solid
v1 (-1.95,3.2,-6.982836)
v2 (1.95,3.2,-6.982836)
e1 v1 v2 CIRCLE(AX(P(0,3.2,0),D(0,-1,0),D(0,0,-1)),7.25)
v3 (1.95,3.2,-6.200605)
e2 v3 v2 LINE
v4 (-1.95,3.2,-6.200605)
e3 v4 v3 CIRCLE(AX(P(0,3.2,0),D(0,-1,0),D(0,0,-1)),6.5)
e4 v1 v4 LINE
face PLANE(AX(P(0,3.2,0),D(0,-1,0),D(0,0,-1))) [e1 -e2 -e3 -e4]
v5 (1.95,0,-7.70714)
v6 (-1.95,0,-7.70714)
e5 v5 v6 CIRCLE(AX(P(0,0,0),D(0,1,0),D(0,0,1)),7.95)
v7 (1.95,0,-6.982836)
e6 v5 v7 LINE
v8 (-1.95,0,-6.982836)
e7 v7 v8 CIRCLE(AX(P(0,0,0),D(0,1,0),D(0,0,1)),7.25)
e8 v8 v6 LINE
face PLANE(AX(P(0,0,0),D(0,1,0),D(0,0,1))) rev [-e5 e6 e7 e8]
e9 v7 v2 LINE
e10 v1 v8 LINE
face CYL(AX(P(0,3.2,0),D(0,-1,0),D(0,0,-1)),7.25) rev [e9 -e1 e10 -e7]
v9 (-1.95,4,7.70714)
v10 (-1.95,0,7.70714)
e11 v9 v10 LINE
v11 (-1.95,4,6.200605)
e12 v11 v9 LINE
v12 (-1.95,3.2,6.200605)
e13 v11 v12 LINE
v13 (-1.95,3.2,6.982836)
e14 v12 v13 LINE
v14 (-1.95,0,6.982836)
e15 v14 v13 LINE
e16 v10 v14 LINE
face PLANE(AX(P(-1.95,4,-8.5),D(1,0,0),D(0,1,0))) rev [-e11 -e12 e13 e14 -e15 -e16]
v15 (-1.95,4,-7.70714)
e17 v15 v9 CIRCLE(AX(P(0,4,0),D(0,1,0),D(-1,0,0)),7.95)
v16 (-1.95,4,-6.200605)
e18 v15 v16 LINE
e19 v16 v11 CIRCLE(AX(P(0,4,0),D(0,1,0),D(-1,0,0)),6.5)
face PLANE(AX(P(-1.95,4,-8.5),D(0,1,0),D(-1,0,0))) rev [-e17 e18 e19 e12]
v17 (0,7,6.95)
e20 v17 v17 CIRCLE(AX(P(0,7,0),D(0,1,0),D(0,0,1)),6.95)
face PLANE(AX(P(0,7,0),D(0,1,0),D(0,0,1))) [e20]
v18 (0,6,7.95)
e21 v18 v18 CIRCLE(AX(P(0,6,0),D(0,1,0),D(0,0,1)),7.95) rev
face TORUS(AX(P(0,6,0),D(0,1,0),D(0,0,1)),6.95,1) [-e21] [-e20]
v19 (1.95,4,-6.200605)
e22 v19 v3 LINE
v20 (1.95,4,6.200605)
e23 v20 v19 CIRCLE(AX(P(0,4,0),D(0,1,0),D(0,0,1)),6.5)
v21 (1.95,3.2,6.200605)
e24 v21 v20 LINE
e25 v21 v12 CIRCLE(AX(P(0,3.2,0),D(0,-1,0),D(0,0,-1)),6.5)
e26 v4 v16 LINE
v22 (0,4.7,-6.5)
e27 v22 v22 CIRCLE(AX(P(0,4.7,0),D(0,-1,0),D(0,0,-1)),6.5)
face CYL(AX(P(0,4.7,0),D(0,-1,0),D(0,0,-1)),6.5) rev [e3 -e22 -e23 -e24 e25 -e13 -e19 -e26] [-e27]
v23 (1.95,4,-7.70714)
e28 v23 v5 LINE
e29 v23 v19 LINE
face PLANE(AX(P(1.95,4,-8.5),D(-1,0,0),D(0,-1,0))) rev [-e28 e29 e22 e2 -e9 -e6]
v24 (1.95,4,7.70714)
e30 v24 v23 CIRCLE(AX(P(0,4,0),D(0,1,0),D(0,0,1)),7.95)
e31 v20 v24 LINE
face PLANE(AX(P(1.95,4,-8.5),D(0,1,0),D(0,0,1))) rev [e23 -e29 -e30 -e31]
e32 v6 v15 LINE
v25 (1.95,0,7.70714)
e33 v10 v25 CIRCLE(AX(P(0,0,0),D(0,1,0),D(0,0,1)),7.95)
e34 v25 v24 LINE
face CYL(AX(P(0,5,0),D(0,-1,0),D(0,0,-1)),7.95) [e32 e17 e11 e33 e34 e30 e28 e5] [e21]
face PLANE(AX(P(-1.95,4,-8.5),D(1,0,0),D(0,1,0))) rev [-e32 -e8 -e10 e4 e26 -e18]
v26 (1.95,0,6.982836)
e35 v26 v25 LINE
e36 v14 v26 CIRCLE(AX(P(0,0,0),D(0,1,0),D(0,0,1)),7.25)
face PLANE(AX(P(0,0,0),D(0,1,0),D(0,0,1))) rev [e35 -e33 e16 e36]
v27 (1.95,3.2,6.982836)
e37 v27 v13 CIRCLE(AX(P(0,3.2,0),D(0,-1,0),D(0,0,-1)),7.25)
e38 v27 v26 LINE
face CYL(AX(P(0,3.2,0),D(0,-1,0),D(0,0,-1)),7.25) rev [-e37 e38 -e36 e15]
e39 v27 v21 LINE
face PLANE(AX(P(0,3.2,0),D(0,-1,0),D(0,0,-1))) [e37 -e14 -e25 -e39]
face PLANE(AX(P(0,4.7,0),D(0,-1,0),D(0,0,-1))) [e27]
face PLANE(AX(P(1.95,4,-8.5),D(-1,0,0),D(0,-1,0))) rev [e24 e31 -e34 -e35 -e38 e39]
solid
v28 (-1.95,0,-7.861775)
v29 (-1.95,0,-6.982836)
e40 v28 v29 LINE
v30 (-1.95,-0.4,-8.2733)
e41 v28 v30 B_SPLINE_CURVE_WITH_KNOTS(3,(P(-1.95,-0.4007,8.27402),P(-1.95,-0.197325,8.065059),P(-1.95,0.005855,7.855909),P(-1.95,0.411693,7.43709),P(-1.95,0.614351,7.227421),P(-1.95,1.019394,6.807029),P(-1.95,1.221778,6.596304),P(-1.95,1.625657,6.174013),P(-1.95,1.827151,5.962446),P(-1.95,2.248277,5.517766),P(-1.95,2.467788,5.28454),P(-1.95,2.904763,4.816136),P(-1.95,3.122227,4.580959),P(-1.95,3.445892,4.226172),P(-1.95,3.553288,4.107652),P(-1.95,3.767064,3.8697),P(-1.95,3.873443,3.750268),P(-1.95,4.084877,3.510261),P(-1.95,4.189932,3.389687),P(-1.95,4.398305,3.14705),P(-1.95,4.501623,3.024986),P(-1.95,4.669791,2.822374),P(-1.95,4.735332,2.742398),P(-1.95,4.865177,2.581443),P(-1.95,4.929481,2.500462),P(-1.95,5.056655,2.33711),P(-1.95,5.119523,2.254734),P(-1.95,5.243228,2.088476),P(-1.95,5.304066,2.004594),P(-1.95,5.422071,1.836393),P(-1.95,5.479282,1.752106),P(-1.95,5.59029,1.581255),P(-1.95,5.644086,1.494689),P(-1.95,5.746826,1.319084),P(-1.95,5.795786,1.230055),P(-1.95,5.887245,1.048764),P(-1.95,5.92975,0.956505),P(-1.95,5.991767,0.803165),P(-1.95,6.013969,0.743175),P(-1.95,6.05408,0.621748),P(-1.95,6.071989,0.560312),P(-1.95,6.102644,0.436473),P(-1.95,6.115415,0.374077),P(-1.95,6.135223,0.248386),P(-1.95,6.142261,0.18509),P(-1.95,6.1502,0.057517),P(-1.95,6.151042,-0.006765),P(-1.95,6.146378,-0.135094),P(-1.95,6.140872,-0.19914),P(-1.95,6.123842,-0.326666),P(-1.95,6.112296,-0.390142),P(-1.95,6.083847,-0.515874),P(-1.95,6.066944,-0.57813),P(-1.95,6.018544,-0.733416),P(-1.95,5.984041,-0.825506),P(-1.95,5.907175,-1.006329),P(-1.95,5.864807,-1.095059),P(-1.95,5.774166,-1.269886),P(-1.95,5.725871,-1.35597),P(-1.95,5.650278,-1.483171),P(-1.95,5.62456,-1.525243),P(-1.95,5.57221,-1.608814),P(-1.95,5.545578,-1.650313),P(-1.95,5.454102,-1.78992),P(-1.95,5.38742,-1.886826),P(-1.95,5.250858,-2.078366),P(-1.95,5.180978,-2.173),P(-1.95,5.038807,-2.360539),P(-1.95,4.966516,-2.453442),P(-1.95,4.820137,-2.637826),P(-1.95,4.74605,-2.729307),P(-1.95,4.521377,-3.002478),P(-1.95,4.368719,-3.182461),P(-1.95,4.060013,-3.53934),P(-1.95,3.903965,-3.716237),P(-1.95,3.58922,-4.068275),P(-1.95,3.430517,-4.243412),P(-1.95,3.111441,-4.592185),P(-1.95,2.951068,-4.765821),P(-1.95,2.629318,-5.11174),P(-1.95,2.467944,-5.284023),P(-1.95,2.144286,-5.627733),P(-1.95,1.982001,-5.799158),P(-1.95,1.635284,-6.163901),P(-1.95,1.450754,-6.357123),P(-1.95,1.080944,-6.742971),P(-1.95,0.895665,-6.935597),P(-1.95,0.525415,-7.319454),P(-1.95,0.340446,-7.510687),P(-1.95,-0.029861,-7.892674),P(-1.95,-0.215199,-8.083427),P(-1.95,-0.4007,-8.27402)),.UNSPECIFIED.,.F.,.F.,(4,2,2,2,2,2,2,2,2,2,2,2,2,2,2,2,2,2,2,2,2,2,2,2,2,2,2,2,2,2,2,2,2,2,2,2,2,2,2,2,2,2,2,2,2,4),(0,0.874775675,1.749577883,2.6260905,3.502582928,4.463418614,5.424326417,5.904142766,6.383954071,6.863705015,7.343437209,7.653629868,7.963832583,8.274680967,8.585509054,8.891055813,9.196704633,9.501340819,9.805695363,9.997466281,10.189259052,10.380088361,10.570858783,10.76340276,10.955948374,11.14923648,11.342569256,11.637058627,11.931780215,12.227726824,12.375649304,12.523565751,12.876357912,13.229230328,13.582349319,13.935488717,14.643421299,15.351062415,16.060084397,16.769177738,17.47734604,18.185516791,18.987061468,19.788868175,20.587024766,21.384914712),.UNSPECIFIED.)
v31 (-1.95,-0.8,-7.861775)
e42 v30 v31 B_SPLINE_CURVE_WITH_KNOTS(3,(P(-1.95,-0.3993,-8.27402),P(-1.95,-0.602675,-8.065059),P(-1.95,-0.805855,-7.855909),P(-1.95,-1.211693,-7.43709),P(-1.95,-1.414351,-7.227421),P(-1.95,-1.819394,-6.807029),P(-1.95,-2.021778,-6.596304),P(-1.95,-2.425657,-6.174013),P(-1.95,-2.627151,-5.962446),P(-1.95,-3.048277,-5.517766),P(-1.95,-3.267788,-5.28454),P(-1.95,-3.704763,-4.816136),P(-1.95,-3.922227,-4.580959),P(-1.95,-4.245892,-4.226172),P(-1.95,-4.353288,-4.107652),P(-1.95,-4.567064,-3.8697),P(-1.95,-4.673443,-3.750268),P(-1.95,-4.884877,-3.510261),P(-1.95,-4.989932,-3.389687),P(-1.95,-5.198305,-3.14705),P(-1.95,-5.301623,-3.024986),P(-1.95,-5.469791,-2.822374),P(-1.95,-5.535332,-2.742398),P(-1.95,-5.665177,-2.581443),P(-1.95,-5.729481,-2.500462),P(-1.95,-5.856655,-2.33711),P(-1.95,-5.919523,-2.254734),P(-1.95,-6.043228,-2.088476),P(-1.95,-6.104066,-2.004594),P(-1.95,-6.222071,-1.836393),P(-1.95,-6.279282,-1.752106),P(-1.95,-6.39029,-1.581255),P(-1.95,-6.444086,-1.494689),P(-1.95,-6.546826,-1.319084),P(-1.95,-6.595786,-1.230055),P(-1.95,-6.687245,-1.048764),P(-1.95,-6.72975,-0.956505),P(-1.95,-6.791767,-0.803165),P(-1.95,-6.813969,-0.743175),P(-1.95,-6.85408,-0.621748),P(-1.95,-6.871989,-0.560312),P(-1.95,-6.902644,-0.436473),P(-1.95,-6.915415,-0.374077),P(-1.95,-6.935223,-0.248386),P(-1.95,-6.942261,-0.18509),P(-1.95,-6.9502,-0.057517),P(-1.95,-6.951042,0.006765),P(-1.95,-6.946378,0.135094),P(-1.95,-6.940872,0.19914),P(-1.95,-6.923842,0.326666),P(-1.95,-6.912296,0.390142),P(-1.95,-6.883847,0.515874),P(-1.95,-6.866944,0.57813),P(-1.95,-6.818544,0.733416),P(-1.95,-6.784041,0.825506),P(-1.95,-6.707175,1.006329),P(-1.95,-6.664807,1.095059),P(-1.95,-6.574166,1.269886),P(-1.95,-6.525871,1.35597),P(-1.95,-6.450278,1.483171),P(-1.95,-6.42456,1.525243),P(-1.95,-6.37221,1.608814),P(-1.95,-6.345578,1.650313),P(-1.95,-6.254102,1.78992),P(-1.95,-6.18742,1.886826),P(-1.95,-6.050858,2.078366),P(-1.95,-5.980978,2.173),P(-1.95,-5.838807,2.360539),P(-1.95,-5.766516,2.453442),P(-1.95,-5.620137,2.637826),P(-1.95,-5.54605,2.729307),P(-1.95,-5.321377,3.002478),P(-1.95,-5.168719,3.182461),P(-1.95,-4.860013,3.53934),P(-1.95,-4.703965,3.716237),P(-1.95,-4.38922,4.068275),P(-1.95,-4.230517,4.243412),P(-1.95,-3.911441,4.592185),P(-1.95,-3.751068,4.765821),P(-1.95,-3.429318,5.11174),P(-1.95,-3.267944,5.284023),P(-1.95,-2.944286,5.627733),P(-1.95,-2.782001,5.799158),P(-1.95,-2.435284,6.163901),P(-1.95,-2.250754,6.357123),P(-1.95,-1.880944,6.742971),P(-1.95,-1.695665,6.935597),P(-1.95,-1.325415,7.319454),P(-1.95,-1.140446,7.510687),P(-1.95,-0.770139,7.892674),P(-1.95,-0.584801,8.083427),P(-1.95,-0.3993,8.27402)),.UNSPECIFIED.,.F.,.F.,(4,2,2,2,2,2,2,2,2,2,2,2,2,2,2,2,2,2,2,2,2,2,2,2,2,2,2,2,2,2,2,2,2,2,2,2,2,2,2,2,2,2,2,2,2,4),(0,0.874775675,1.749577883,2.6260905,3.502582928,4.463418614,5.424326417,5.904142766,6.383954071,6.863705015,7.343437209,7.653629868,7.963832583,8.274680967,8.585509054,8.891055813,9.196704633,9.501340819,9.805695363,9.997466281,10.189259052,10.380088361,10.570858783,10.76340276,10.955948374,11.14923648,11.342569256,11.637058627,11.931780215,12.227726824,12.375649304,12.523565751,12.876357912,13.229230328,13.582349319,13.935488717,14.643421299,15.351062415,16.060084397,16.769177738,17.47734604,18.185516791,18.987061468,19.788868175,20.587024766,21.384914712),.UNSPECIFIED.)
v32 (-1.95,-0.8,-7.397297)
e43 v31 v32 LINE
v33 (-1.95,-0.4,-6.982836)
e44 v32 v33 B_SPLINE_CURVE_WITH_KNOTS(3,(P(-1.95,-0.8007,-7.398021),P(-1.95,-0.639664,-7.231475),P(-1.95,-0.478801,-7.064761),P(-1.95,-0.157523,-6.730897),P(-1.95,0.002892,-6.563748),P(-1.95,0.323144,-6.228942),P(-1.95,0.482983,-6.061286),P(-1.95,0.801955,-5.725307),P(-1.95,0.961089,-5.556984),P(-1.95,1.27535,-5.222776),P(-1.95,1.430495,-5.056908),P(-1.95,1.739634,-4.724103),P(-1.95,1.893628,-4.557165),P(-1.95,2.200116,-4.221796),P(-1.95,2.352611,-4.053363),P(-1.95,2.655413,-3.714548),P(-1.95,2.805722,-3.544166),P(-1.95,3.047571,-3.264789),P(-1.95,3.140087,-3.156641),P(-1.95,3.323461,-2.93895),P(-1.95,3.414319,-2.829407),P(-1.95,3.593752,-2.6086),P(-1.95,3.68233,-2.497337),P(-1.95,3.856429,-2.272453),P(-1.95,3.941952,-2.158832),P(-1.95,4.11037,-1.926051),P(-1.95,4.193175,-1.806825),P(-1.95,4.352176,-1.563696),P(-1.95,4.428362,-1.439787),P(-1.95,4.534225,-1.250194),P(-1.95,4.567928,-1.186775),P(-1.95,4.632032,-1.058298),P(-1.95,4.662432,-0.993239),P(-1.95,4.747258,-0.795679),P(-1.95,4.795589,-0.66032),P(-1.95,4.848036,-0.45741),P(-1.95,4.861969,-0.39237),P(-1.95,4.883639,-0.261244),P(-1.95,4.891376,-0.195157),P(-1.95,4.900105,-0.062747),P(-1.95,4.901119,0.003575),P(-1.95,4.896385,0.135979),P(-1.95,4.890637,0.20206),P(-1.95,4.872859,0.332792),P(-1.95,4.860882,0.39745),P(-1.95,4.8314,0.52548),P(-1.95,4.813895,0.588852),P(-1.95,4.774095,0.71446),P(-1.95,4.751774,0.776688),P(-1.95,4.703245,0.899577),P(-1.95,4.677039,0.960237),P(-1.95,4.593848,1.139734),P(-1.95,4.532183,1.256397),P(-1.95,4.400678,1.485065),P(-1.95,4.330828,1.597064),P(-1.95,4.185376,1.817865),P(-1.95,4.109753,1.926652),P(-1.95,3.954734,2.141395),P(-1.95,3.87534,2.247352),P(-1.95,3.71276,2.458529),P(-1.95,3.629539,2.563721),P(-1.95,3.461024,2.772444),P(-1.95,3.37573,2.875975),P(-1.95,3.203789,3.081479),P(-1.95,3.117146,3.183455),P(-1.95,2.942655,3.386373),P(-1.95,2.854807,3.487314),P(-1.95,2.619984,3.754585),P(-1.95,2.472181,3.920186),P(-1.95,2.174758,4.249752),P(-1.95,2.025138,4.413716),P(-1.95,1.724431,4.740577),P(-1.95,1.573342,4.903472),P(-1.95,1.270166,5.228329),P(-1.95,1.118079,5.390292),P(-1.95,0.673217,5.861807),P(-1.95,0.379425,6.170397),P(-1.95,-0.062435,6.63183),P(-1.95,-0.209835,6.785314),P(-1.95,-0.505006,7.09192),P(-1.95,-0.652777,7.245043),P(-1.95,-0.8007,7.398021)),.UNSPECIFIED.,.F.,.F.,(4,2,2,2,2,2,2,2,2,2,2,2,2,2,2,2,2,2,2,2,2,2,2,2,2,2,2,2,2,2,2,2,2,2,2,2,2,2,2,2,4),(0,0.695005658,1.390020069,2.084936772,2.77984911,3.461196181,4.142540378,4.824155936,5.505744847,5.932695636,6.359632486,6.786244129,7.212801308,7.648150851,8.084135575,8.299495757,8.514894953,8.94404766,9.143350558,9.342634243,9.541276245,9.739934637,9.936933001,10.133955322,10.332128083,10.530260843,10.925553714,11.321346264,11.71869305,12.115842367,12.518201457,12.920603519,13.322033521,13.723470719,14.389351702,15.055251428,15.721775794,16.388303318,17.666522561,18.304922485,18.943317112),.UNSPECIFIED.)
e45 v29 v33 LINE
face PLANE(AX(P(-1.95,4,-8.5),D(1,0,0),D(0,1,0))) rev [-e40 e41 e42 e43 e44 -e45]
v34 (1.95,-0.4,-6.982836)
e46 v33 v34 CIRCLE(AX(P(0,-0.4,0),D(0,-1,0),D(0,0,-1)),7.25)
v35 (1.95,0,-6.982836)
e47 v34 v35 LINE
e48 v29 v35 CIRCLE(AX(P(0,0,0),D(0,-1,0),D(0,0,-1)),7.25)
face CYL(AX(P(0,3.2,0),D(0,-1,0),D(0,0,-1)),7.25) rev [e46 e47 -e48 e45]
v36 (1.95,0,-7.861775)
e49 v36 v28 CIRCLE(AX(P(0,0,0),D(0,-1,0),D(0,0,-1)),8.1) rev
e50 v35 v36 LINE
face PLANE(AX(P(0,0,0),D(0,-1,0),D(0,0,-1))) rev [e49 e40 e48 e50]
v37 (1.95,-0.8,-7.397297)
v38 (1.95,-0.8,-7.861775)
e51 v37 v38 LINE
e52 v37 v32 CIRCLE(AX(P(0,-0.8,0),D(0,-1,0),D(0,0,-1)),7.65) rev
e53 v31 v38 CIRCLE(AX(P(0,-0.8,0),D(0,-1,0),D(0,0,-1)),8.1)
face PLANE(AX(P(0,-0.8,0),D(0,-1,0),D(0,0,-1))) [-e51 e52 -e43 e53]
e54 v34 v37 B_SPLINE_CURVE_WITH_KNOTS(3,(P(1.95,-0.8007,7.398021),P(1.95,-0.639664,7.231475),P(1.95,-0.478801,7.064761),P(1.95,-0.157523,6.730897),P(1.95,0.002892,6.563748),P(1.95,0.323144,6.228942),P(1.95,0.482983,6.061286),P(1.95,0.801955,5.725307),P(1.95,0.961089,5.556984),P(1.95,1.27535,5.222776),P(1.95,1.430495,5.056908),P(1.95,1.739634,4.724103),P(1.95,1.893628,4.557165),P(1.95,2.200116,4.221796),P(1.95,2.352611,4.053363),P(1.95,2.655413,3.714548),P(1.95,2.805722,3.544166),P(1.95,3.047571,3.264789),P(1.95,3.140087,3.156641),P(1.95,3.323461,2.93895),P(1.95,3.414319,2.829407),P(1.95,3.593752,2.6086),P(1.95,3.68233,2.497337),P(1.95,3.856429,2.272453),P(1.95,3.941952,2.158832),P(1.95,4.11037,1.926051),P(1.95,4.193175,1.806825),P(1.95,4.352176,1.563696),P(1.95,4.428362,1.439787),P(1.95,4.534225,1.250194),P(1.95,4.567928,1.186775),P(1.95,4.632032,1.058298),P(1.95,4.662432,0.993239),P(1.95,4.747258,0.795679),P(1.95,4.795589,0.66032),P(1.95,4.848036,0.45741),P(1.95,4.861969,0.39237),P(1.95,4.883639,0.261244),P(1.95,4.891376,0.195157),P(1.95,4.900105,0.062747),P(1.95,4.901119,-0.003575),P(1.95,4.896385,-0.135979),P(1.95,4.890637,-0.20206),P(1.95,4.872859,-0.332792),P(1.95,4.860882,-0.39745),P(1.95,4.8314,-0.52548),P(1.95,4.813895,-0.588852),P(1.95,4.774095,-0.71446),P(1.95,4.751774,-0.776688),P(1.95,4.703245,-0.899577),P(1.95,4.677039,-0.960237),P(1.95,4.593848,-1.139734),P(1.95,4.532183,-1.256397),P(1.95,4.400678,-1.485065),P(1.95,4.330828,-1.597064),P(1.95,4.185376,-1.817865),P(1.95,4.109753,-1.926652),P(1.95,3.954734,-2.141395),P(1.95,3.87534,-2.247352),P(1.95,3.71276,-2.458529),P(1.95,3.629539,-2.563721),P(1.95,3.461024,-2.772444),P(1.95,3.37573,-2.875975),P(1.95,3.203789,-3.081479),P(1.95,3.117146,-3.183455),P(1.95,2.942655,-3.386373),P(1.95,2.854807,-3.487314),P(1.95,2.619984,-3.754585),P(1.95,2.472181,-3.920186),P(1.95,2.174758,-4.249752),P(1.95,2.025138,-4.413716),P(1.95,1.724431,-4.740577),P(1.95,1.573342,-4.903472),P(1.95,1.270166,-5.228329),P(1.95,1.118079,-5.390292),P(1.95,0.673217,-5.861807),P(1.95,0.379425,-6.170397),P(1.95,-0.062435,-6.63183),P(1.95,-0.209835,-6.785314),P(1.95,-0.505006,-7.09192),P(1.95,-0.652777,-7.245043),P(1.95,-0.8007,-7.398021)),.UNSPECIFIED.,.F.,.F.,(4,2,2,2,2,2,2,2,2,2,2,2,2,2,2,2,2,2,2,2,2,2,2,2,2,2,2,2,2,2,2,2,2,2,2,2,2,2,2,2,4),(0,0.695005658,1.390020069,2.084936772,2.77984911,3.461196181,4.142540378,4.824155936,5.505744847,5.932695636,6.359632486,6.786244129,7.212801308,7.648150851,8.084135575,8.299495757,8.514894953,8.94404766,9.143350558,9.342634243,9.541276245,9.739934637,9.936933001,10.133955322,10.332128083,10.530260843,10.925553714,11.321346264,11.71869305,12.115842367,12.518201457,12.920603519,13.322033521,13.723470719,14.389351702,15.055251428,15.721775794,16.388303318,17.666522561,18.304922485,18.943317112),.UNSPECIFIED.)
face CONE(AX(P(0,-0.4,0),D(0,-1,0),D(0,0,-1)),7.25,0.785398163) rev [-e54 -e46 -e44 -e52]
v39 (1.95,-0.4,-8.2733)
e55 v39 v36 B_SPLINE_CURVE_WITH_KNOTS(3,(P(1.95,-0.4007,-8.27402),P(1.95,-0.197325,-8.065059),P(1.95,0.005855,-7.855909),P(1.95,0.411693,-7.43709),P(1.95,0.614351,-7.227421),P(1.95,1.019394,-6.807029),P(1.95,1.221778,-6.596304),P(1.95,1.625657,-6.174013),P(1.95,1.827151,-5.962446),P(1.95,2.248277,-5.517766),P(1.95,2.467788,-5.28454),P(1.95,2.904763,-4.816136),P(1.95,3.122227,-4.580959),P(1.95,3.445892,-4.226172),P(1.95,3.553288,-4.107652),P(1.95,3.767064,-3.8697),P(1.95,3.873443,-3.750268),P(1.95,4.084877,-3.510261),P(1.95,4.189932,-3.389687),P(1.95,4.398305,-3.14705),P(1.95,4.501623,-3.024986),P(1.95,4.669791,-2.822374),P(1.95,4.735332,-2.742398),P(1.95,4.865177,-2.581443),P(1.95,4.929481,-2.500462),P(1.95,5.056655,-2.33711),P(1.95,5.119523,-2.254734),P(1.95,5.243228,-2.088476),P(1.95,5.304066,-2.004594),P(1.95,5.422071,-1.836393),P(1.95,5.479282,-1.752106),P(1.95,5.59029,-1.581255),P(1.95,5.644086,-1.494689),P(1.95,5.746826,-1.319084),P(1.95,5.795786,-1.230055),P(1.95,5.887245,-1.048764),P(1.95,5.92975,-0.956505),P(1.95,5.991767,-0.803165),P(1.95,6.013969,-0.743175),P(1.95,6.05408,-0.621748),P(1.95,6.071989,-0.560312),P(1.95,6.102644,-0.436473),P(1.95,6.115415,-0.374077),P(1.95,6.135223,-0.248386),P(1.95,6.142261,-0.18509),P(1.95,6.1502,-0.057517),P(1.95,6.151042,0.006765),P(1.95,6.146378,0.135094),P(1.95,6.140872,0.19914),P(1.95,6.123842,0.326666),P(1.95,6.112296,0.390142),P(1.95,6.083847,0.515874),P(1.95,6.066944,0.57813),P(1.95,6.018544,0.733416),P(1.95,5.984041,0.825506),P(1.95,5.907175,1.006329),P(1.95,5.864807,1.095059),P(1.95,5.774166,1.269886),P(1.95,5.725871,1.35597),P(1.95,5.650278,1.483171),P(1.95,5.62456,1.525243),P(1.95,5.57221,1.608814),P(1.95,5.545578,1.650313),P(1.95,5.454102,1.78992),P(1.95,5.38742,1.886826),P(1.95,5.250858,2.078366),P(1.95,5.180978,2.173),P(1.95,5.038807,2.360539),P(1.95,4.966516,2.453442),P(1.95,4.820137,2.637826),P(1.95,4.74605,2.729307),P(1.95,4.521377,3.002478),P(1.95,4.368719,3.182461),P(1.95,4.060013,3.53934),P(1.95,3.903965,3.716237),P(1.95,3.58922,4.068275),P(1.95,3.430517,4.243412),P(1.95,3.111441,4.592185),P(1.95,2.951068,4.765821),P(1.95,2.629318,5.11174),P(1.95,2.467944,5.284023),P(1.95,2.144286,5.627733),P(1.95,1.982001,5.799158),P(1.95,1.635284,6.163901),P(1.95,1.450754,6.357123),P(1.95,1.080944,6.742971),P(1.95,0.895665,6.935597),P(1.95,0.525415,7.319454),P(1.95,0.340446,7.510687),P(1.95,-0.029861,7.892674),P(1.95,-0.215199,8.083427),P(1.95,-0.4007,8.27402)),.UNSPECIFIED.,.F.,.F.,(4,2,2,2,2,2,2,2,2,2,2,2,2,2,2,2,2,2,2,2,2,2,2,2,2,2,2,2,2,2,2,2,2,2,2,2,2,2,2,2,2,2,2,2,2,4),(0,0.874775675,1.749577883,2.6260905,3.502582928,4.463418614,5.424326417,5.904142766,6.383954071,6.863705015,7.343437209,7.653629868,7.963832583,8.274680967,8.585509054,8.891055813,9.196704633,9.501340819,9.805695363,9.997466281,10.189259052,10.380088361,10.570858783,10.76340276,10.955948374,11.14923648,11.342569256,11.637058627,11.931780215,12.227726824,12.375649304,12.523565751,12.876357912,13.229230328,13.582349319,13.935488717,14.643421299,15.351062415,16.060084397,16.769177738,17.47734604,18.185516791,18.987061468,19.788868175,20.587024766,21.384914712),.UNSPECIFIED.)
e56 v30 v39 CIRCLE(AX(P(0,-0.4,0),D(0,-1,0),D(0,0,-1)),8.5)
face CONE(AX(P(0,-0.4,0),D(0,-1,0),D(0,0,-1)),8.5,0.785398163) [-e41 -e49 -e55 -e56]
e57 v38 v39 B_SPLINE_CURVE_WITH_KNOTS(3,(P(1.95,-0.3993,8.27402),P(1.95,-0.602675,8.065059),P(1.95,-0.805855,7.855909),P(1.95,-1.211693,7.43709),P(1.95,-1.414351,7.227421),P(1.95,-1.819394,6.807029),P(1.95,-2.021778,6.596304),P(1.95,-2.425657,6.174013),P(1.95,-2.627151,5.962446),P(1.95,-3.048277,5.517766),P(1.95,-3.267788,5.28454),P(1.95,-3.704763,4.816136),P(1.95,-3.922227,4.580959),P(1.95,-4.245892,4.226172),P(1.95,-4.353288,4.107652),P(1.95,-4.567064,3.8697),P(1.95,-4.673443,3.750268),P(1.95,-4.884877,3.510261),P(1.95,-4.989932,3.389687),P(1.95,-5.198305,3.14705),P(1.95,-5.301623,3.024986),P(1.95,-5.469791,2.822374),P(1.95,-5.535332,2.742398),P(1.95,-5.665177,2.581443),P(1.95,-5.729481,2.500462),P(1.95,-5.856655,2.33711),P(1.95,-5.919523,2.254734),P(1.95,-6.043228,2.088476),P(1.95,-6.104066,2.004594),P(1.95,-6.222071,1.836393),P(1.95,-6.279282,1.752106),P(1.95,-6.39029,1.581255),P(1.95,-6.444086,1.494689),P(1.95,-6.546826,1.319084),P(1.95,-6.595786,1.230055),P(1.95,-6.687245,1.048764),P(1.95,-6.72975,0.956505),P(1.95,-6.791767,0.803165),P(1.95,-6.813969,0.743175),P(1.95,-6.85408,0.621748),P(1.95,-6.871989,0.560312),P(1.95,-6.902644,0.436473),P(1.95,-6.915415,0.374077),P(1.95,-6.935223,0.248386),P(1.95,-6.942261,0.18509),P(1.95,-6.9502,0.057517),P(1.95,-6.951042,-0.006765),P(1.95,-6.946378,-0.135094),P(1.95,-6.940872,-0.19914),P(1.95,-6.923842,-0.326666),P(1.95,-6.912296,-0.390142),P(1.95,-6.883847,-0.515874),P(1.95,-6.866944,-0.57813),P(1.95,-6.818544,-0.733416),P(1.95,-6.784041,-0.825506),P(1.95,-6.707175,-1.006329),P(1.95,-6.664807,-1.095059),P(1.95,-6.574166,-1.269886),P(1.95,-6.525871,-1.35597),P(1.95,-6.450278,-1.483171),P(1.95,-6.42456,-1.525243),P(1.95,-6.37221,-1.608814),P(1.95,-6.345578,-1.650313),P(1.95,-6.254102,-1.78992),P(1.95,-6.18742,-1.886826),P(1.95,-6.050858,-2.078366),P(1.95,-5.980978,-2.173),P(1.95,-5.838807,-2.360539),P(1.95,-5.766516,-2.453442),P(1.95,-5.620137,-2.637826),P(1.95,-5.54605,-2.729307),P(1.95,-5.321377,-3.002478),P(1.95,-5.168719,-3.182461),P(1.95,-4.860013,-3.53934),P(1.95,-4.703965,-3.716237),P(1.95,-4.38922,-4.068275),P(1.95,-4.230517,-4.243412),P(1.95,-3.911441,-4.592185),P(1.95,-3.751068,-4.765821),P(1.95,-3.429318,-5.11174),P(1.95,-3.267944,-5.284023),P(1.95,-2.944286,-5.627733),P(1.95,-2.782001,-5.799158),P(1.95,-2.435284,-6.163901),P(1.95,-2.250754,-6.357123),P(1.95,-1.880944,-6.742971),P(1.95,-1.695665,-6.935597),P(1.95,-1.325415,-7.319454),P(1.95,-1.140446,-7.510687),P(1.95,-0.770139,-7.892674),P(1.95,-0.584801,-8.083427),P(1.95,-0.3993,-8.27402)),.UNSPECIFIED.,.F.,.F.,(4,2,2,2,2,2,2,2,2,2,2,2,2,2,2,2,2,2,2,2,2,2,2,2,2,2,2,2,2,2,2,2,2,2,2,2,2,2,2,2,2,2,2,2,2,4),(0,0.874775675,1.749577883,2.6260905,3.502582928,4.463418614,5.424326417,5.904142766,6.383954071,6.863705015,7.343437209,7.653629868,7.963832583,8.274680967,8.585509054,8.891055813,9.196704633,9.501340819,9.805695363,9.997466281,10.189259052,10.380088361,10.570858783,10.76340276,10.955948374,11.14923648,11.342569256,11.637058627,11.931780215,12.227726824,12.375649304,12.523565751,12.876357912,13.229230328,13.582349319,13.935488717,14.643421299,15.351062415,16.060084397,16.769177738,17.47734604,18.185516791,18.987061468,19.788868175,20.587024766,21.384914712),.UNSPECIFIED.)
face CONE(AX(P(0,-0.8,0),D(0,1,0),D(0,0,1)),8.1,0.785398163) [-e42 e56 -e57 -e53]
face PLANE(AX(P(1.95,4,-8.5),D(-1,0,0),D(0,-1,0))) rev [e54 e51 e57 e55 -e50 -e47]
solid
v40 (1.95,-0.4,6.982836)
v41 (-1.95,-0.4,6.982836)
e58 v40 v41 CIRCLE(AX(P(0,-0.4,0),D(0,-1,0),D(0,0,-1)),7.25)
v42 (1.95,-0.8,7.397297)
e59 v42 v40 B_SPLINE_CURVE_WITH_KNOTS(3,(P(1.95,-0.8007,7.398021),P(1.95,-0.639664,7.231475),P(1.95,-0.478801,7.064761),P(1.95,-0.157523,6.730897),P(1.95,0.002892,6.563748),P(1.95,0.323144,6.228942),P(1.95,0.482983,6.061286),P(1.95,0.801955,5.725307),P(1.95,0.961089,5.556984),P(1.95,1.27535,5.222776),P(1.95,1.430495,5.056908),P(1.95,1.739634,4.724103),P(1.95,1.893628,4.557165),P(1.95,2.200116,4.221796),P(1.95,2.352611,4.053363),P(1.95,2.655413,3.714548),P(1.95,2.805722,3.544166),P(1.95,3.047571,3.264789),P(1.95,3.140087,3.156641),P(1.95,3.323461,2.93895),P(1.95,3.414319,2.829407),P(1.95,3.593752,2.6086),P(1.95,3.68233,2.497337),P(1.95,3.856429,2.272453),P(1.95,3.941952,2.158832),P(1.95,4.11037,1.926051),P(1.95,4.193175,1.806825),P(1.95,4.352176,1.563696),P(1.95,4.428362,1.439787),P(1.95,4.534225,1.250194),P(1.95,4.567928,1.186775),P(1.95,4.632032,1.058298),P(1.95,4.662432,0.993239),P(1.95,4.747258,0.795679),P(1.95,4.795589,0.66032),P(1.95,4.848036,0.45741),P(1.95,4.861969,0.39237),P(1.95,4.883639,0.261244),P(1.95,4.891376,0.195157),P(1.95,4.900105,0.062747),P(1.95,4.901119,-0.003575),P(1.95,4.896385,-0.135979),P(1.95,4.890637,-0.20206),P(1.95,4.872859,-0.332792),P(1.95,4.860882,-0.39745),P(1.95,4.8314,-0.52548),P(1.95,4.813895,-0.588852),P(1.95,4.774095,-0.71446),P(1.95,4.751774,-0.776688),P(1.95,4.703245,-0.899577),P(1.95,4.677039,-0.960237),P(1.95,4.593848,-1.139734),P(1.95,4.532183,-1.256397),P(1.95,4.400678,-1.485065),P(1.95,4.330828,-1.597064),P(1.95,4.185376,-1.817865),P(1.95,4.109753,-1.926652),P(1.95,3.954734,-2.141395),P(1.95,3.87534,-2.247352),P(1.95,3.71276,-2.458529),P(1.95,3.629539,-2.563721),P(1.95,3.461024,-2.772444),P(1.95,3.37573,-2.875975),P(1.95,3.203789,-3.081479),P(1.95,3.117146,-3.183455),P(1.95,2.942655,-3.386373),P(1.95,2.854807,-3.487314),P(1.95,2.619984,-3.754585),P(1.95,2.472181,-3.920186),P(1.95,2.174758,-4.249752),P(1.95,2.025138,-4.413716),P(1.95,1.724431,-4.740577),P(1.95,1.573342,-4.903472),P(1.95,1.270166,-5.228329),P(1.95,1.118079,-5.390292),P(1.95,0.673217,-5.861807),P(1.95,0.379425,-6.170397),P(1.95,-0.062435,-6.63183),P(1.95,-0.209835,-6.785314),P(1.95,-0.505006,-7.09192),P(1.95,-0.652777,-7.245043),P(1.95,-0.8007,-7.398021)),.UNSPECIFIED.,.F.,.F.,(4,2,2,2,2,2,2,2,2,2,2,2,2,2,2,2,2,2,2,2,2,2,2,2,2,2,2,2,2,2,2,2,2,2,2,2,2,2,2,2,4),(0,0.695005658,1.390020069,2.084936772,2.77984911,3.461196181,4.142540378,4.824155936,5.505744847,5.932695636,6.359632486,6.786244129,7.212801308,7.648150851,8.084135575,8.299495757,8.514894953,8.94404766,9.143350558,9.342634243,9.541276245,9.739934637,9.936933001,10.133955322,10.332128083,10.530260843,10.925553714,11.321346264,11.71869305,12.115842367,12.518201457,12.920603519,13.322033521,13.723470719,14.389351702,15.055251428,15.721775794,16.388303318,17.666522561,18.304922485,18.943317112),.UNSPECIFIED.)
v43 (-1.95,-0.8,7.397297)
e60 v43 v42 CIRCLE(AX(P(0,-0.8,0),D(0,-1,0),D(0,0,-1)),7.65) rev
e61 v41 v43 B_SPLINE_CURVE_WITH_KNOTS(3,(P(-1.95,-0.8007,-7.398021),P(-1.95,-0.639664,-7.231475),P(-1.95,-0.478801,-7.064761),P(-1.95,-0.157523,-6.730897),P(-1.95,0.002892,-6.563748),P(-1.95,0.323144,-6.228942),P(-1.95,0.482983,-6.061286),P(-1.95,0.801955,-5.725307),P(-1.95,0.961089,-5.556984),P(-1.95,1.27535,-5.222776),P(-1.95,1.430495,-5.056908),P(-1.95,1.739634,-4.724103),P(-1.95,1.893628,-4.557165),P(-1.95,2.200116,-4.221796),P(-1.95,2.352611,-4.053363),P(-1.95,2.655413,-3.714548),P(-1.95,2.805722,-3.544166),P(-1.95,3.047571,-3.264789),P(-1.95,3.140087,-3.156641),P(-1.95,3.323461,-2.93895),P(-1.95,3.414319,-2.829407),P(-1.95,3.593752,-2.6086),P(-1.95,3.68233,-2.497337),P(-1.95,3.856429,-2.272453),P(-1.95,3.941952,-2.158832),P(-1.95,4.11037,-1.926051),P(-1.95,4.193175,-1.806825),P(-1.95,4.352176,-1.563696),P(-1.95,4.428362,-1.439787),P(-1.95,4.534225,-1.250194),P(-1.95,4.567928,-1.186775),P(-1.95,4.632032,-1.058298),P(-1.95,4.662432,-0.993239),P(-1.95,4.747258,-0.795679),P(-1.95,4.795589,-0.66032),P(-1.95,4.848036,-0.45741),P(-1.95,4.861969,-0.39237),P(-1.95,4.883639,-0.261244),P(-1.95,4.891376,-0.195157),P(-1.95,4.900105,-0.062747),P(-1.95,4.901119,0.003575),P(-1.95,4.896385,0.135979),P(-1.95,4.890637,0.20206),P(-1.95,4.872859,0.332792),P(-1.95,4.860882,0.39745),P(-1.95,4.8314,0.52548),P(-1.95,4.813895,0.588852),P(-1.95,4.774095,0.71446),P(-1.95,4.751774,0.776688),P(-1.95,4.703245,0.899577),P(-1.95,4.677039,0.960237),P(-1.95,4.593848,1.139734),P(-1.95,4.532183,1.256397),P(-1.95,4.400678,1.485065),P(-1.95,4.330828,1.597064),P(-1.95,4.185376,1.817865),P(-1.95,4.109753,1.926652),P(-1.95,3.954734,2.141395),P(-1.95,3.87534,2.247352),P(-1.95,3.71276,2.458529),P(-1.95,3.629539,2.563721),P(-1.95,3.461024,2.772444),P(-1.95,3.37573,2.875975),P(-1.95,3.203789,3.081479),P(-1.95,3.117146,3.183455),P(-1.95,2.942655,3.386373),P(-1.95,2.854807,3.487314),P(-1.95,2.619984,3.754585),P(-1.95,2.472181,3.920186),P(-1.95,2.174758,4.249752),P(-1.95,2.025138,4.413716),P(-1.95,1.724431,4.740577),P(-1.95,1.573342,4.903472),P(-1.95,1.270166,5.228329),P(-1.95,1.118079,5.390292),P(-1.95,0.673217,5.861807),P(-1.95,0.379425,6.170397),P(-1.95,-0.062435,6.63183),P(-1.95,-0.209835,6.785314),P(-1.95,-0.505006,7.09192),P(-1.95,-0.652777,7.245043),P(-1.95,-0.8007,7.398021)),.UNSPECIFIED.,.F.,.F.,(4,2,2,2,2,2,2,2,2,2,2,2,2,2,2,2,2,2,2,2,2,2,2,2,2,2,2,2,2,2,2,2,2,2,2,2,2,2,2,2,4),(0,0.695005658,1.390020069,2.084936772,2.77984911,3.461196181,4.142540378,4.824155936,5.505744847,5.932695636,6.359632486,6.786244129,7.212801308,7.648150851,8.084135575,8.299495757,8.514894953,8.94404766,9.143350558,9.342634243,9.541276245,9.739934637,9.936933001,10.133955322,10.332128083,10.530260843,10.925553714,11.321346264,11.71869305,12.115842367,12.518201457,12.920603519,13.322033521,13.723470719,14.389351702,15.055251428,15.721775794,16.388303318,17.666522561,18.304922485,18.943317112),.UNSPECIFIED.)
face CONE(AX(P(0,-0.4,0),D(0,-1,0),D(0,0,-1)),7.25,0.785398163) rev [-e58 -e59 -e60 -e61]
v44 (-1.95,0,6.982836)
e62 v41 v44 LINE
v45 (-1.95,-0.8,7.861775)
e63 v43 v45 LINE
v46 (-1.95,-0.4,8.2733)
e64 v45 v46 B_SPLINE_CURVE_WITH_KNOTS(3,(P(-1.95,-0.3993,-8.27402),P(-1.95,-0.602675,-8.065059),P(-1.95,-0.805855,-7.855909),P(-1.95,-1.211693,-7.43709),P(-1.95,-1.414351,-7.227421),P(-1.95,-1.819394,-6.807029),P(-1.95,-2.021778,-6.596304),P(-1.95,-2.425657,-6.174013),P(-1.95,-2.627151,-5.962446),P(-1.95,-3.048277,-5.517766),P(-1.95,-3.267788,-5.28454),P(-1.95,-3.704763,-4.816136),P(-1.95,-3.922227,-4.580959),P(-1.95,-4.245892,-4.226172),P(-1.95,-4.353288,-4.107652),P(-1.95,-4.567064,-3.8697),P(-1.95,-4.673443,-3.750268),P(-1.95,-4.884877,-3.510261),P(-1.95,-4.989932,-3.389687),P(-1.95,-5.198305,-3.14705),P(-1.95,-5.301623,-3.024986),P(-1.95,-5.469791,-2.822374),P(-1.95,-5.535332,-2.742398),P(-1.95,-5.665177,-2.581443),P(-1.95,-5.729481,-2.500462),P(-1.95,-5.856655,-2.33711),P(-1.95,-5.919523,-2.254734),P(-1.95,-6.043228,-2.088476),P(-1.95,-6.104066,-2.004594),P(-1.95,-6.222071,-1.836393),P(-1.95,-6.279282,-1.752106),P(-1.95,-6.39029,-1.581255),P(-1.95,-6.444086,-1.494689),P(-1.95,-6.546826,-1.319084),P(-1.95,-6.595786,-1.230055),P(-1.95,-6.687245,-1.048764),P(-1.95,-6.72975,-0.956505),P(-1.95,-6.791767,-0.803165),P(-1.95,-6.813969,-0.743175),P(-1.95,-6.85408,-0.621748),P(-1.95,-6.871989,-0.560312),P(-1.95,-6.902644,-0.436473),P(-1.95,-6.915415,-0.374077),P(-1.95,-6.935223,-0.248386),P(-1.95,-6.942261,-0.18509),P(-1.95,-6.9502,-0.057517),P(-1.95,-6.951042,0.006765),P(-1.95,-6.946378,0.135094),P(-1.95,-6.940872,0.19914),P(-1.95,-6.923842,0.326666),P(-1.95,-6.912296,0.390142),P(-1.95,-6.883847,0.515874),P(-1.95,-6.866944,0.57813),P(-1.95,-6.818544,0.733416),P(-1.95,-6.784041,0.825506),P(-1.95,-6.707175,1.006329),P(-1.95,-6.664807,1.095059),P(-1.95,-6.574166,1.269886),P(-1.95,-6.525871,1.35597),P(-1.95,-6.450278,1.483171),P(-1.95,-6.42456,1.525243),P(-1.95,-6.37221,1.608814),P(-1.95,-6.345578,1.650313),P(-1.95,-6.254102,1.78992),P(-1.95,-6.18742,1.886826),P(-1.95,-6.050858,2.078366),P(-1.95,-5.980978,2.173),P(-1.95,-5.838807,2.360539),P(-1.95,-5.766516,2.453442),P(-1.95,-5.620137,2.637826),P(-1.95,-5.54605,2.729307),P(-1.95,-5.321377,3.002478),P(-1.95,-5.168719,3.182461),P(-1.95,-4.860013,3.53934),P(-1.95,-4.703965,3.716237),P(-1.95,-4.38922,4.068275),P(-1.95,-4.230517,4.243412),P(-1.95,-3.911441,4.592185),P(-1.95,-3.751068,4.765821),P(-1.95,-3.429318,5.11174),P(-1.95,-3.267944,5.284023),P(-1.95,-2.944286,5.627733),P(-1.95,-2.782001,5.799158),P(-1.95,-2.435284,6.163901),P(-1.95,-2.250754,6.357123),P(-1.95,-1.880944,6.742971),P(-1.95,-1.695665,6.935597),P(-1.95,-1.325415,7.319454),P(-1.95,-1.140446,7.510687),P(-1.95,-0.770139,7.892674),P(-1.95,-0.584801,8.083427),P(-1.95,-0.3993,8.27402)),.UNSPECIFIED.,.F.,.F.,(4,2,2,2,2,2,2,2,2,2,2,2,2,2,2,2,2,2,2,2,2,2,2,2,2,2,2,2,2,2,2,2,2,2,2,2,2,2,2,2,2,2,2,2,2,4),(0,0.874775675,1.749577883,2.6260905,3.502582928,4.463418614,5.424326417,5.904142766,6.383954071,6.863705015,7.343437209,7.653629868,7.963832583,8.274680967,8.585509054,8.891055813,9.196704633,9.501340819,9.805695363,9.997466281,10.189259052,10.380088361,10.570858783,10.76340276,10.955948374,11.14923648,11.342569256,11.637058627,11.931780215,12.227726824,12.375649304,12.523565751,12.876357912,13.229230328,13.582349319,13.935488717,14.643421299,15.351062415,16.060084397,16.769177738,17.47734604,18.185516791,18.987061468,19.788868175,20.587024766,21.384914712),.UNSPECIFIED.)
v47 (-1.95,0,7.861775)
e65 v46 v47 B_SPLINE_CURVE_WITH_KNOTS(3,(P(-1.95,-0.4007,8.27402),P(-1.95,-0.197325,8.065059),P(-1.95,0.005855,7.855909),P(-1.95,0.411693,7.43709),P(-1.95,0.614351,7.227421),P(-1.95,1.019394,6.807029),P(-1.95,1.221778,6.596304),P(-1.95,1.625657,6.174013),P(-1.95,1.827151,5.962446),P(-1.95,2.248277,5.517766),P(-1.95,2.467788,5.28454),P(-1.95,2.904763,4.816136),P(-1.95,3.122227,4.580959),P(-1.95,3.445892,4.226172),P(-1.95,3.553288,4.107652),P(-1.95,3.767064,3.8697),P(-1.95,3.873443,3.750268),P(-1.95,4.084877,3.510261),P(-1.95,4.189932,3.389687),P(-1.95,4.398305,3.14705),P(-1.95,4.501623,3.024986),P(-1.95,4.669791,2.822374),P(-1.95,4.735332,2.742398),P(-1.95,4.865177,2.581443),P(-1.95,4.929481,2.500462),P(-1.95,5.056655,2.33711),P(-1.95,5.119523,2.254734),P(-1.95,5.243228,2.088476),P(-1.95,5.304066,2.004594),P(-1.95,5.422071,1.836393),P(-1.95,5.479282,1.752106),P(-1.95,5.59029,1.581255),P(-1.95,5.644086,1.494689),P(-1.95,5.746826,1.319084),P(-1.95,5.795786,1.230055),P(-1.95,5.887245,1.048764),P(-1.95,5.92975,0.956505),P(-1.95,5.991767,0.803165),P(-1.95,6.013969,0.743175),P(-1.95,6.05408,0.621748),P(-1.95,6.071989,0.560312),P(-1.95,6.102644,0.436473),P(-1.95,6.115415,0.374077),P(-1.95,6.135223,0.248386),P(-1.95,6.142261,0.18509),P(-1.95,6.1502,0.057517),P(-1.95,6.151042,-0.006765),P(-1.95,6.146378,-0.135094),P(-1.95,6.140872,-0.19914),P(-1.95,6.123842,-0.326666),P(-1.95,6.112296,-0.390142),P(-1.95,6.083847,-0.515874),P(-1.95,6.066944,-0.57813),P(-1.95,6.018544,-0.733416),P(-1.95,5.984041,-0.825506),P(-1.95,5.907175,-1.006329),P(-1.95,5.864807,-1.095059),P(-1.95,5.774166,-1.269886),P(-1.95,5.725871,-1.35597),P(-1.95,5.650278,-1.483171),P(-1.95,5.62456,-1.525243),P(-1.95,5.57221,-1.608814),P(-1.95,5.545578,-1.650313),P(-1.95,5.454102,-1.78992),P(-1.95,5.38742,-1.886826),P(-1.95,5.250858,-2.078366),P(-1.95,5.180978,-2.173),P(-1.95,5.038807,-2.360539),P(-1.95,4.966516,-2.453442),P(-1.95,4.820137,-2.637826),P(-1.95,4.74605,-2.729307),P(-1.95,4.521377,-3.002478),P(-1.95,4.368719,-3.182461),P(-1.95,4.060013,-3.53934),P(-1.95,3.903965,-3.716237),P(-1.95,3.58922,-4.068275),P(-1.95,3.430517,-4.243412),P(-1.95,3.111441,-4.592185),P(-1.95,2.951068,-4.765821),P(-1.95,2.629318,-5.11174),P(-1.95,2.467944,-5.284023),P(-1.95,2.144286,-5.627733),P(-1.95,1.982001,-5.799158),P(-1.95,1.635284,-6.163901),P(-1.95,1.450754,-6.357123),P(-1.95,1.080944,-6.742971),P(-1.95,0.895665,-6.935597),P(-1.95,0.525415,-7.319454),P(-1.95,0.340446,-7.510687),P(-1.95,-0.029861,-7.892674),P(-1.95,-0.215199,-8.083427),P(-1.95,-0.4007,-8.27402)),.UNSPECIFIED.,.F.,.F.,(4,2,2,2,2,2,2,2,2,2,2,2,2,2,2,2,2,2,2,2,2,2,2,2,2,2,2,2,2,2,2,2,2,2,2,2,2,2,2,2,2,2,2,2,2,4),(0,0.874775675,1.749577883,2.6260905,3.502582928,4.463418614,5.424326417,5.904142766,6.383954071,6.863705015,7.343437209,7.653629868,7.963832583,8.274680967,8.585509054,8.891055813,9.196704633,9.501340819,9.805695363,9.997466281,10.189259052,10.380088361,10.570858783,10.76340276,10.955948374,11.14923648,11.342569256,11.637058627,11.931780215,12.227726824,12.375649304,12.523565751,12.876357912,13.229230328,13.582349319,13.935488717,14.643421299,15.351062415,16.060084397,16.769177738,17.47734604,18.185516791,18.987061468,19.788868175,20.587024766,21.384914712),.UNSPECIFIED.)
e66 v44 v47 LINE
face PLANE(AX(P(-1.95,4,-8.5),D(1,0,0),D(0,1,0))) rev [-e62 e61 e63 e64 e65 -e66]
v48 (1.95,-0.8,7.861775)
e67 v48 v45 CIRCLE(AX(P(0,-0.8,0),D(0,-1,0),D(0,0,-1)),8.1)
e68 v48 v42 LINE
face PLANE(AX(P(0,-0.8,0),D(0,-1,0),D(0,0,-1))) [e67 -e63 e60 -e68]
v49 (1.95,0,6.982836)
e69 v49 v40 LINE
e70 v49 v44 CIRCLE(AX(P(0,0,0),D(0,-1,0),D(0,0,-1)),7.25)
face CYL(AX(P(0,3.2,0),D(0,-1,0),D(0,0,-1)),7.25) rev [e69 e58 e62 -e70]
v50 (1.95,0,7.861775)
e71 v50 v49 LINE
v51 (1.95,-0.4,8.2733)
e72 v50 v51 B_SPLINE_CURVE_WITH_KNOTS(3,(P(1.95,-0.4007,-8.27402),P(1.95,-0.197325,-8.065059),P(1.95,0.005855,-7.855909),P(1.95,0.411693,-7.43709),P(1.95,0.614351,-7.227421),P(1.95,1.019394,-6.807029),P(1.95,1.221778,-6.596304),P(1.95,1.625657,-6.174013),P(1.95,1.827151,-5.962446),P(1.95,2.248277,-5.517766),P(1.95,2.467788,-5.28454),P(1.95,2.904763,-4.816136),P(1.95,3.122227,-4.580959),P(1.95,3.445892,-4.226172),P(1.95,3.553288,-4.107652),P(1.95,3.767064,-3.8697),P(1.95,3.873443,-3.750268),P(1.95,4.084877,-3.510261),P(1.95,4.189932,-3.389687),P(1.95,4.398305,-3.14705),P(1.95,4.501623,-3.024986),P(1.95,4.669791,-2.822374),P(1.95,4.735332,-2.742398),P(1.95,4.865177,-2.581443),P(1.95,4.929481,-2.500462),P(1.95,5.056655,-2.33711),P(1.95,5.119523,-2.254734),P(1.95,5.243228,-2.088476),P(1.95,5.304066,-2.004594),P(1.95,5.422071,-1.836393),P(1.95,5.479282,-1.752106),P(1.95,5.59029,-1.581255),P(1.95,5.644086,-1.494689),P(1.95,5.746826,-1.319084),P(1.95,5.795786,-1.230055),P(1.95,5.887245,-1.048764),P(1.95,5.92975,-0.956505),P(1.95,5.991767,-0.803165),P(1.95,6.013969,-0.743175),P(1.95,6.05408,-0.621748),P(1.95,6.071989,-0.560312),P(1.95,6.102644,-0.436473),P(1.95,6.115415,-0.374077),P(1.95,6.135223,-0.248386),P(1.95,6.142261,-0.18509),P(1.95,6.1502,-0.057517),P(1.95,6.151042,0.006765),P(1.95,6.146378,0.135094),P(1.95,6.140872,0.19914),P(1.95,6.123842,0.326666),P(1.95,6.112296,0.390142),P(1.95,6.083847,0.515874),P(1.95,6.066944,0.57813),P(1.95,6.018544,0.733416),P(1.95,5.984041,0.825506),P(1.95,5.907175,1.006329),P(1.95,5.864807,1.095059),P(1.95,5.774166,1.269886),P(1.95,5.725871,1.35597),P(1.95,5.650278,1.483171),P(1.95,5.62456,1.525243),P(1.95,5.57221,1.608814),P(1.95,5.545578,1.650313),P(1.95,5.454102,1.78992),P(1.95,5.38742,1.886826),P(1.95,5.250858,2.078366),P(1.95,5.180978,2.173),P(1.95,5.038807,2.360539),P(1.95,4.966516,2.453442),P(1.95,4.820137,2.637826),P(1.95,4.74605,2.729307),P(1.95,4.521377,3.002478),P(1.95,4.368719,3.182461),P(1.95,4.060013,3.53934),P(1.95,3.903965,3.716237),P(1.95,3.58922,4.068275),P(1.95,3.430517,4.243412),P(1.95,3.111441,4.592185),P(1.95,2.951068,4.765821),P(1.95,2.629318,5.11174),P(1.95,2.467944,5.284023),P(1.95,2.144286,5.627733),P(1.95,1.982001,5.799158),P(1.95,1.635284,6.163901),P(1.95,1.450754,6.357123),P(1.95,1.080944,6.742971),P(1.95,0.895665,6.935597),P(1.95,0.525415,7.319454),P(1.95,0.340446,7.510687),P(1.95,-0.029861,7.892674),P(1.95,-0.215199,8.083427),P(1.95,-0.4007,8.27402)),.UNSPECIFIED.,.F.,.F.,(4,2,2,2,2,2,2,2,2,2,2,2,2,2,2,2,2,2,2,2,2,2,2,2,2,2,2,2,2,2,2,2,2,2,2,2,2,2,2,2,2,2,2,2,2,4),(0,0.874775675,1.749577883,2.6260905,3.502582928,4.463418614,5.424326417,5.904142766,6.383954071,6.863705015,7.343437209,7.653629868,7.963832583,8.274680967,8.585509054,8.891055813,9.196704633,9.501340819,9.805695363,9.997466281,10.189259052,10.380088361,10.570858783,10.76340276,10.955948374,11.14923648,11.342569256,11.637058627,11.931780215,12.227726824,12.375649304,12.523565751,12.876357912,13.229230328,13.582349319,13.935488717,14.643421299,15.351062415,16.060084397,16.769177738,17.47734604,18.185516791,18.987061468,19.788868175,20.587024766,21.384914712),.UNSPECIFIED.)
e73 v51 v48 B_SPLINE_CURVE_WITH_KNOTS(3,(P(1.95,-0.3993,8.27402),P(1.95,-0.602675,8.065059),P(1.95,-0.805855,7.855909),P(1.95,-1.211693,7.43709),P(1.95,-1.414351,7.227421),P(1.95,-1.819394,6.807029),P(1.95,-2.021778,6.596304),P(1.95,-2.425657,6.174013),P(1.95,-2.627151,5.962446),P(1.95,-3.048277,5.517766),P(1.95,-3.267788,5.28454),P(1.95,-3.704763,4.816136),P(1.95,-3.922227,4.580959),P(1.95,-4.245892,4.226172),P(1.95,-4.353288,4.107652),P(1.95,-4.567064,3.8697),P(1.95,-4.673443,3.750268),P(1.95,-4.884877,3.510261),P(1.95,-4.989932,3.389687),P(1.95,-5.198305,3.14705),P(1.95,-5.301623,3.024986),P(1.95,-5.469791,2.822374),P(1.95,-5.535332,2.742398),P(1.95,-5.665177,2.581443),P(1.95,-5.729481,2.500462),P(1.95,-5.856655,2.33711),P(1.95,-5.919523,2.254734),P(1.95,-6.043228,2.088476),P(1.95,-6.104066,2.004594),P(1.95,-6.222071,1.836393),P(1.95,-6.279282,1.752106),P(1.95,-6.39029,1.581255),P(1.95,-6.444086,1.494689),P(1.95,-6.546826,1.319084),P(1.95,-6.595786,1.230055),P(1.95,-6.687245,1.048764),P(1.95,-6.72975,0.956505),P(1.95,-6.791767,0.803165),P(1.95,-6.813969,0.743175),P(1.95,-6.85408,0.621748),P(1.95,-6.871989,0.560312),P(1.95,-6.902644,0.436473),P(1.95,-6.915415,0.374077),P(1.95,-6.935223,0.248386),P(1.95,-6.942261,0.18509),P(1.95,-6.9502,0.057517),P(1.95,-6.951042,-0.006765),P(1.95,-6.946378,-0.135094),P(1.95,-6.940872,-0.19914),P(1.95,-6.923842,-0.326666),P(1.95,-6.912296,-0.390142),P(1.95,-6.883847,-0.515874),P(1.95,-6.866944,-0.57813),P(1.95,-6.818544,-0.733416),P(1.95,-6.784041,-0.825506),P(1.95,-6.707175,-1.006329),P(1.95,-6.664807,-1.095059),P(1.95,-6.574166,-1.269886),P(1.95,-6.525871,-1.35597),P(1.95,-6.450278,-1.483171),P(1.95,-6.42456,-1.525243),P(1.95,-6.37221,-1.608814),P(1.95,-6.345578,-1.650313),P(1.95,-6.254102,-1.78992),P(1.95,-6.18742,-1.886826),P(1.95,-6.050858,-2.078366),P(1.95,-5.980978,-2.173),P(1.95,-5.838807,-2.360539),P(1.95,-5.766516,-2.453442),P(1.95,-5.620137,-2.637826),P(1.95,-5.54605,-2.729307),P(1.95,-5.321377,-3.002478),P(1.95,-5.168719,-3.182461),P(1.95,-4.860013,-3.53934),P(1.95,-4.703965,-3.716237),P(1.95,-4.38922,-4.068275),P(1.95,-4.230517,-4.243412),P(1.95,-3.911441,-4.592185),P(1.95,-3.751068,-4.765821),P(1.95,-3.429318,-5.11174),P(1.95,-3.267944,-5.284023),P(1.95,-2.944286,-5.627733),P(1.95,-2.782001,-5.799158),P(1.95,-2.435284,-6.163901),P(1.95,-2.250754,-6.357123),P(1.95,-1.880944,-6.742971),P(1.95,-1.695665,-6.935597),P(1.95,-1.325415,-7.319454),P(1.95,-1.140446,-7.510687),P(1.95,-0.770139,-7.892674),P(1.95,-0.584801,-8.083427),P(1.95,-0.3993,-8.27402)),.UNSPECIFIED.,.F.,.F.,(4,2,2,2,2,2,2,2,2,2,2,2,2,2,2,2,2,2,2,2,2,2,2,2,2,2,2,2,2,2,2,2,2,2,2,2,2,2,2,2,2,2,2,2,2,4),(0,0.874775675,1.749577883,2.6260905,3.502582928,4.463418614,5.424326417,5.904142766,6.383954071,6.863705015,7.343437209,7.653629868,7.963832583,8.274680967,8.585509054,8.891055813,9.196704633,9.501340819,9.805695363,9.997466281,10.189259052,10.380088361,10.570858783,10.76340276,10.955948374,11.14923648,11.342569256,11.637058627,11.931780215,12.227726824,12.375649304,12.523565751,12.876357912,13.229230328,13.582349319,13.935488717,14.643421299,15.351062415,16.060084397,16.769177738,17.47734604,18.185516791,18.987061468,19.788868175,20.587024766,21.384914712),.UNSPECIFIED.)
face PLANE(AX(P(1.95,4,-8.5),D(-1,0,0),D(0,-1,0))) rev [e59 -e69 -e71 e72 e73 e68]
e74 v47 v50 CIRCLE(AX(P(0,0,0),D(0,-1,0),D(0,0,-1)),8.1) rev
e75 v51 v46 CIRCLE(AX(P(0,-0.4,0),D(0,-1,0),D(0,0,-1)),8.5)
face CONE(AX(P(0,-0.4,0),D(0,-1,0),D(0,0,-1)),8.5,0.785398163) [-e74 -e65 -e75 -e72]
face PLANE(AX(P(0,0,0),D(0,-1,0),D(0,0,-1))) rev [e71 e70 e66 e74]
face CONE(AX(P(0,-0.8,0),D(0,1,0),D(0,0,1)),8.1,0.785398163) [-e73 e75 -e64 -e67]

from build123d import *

# Parameters (mm, degrees)
SKETCH_2_R               = 7.95
EXTRUDE_1_DEPTH          = 5
SKETCH_4_R               = 8.5
EXTRUDE_2_DEPTH          = 0.8
SKETCH_3_R               = 7.25
CUT_EXTRUDE_2_DEPTH      = 4
CHAMFER_2_SIZE           = 0.4
CUT_EXTRUDE_3_DEPTH      = 14.019216566
CUT_EXTRUDE_3_DEPTH_BACK = 14.019216566
SKETCH_5_W               = 6
SKETCH_5_H               = 8
SKETCH_6_R               = 7.95
EXTRUDE_3_DEPTH          = 2
FILLET_1_R               = 1
SKETCH_7_R               = 6.5
CUT_EXTRUDE_4_DEPTH      = 1.5
CUT_EXTRUDE_8_DEPTH      = 14.910427743
CUT_EXTRUDE_8_DEPTH_BACK = 14.910427743
SKETCH_9_W               = 2.014745723
SKETCH_9_H               = 2.313226571
SKETCH_9_W_2             = 1.942835104
SKETCH_9_H_2             = 2.895732504


with BuildPart() as part:
    # 草图2 → 凸台-拉伸1 (new body)
    with BuildSketch(Plane(origin=(0, 0, 0), x_dir=(1, 0, 0), z_dir=(0, 1, 0))):
        with Locations(Location((0, 0, 0), (0, 0, 270))):
            Circle(SKETCH_2_R)
    extrude(amount=EXTRUDE_1_DEPTH)


with BuildPart() as body_2:
    # 草图4 → 凸台-拉伸2 (new body)
    with BuildSketch(Plane.XZ):
        with Locations(Location((0, 0, 0), (0, 0, 270))):
            Circle(SKETCH_4_R)
    extrude(amount=EXTRUDE_2_DEPTH)


with BuildPart() as cut_extrude_2_tool:
    # 草图3 → 切除-拉伸2 (new body)
    with BuildSketch(Plane.XZ.offset(0.8)):
        with Locations(Location((0, 0, 0), (0, 0, 270))):
            Circle(SKETCH_3_R)
    extrude(amount=-CUT_EXTRUDE_2_DEPTH)


with BuildPart() as part_1:
    add(part.part)

    # 切除-拉伸2: cut by cut_extrude_2_tool
    add(cut_extrude_2_tool.part, mode=Mode.SUBTRACT)


with BuildPart() as body_2_1:
    add(body_2.part)

    # 切除-拉伸2: cut by cut_extrude_2_tool
    add(cut_extrude_2_tool.part, mode=Mode.SUBTRACT)

    # 倒角2
    # the kernel refuses this chamfer: 0.4 mm, written as the material it takes off along each edge
    with BuildSketch(Plane(origin=(0, 0, 0), x_dir=(0, 0, -1), z_dir=(-1, 0, 0))) as chamfer_2_piece_1:
        Polygon((8.5, CHAMFER_2_SIZE), (8.5 - CHAMFER_2_SIZE, 0), (8.5, 0), align=None)
    revolve(axis=Axis((0, 0, 0), (0, -1, 0)), mode=Mode.SUBTRACT)
    with BuildSketch(Plane(origin=(0, -0.8, 0), x_dir=(0, 0, -1), z_dir=(-1, 0, 0))) as chamfer_2_piece_2:
        Polygon((8.5, -CHAMFER_2_SIZE), (8.5 - CHAMFER_2_SIZE, 0), (8.5, 0), align=None)
    revolve(axis=Axis((0, -0.8, 0), (0, -1, 0)), mode=Mode.SUBTRACT)
    with BuildSketch(Plane(origin=(0, -0.8, 0), x_dir=(0, 0, -1), z_dir=(-1, 0, 0))) as chamfer_2_piece_3:
        Polygon((7.25 + CHAMFER_2_SIZE, 0), (7.25, -CHAMFER_2_SIZE), (7.25, 0), align=None)
    revolve(axis=Axis((0, -0.8, 0), (0, -1, 0)), mode=Mode.SUBTRACT)


with BuildPart() as cut_extrude_3_tool:
    # 草图5 → 切除-拉伸3 (new, two sides: drawn at the far end of the back side and taken through both)
    with BuildSketch(Plane.XY.offset(-CUT_EXTRUDE_3_DEPTH_BACK)):
        with Locations((-4.95, 0)):
            Rectangle(SKETCH_5_W, SKETCH_5_H)
        with Locations((4.95, 0)):
            Rectangle(SKETCH_5_W, SKETCH_5_H)
    extrude(amount=CUT_EXTRUDE_3_DEPTH + CUT_EXTRUDE_3_DEPTH_BACK)


with BuildPart() as part_2:
    add(part_1.part)

    # 切除-拉伸3: cut by cut_extrude_3_tool
    add(cut_extrude_3_tool.part, mode=Mode.SUBTRACT)

    # 草图6 → 凸台-拉伸3 (add)
    with BuildSketch(Plane(origin=(0, 5, 0), x_dir=(1, 0, 0), z_dir=(0, 1, 0))):
        with Locations(Location((0, 0, 0), (0, 0, 75.801440125))):
            Circle(SKETCH_6_R)
    extrude(amount=EXTRUDE_3_DEPTH)

    # 圆角1
    fillet_1_edges = [part_2.edges().sort_by_distance(p)[0] for p in [
        (-1.95, 7, 7.707139547),
    ]]
    fillet(fillet_1_edges, radius=FILLET_1_R)

    # 草图7 → 切除-拉伸4 (cut)
    with BuildSketch(Plane.XZ.offset(-3.2)):
        with Locations(Location((0, 0, 0), (0, 0, 270))):
            Circle(SKETCH_7_R)
    extrude(amount=-CUT_EXTRUDE_4_DEPTH, mode=Mode.SUBTRACT)


with BuildPart() as body_2_2:
    add(body_2_1.part)

    # 切除-拉伸3: cut by cut_extrude_3_tool
    add(cut_extrude_3_tool.part, mode=Mode.SUBTRACT)

    # 草图9 → 切除-拉伸8 (cut, two sides: drawn at the far end of the back side and taken through both)
    with BuildSketch(Plane.XY.offset(-CUT_EXTRUDE_8_DEPTH_BACK)):
        with Locations((-8.140610587, -0.399654316)):
            Rectangle(SKETCH_9_W, SKETCH_9_H)
        with Locations((7.842413689, -0.690907284)):
            Rectangle(SKETCH_9_W_2, SKETCH_9_H_2)
    extrude(amount=CUT_EXTRUDE_8_DEPTH + CUT_EXTRUDE_8_DEPTH_BACK, mode=Mode.SUBTRACT)


solid = Compound([part_2.part, body_2_2.part])
